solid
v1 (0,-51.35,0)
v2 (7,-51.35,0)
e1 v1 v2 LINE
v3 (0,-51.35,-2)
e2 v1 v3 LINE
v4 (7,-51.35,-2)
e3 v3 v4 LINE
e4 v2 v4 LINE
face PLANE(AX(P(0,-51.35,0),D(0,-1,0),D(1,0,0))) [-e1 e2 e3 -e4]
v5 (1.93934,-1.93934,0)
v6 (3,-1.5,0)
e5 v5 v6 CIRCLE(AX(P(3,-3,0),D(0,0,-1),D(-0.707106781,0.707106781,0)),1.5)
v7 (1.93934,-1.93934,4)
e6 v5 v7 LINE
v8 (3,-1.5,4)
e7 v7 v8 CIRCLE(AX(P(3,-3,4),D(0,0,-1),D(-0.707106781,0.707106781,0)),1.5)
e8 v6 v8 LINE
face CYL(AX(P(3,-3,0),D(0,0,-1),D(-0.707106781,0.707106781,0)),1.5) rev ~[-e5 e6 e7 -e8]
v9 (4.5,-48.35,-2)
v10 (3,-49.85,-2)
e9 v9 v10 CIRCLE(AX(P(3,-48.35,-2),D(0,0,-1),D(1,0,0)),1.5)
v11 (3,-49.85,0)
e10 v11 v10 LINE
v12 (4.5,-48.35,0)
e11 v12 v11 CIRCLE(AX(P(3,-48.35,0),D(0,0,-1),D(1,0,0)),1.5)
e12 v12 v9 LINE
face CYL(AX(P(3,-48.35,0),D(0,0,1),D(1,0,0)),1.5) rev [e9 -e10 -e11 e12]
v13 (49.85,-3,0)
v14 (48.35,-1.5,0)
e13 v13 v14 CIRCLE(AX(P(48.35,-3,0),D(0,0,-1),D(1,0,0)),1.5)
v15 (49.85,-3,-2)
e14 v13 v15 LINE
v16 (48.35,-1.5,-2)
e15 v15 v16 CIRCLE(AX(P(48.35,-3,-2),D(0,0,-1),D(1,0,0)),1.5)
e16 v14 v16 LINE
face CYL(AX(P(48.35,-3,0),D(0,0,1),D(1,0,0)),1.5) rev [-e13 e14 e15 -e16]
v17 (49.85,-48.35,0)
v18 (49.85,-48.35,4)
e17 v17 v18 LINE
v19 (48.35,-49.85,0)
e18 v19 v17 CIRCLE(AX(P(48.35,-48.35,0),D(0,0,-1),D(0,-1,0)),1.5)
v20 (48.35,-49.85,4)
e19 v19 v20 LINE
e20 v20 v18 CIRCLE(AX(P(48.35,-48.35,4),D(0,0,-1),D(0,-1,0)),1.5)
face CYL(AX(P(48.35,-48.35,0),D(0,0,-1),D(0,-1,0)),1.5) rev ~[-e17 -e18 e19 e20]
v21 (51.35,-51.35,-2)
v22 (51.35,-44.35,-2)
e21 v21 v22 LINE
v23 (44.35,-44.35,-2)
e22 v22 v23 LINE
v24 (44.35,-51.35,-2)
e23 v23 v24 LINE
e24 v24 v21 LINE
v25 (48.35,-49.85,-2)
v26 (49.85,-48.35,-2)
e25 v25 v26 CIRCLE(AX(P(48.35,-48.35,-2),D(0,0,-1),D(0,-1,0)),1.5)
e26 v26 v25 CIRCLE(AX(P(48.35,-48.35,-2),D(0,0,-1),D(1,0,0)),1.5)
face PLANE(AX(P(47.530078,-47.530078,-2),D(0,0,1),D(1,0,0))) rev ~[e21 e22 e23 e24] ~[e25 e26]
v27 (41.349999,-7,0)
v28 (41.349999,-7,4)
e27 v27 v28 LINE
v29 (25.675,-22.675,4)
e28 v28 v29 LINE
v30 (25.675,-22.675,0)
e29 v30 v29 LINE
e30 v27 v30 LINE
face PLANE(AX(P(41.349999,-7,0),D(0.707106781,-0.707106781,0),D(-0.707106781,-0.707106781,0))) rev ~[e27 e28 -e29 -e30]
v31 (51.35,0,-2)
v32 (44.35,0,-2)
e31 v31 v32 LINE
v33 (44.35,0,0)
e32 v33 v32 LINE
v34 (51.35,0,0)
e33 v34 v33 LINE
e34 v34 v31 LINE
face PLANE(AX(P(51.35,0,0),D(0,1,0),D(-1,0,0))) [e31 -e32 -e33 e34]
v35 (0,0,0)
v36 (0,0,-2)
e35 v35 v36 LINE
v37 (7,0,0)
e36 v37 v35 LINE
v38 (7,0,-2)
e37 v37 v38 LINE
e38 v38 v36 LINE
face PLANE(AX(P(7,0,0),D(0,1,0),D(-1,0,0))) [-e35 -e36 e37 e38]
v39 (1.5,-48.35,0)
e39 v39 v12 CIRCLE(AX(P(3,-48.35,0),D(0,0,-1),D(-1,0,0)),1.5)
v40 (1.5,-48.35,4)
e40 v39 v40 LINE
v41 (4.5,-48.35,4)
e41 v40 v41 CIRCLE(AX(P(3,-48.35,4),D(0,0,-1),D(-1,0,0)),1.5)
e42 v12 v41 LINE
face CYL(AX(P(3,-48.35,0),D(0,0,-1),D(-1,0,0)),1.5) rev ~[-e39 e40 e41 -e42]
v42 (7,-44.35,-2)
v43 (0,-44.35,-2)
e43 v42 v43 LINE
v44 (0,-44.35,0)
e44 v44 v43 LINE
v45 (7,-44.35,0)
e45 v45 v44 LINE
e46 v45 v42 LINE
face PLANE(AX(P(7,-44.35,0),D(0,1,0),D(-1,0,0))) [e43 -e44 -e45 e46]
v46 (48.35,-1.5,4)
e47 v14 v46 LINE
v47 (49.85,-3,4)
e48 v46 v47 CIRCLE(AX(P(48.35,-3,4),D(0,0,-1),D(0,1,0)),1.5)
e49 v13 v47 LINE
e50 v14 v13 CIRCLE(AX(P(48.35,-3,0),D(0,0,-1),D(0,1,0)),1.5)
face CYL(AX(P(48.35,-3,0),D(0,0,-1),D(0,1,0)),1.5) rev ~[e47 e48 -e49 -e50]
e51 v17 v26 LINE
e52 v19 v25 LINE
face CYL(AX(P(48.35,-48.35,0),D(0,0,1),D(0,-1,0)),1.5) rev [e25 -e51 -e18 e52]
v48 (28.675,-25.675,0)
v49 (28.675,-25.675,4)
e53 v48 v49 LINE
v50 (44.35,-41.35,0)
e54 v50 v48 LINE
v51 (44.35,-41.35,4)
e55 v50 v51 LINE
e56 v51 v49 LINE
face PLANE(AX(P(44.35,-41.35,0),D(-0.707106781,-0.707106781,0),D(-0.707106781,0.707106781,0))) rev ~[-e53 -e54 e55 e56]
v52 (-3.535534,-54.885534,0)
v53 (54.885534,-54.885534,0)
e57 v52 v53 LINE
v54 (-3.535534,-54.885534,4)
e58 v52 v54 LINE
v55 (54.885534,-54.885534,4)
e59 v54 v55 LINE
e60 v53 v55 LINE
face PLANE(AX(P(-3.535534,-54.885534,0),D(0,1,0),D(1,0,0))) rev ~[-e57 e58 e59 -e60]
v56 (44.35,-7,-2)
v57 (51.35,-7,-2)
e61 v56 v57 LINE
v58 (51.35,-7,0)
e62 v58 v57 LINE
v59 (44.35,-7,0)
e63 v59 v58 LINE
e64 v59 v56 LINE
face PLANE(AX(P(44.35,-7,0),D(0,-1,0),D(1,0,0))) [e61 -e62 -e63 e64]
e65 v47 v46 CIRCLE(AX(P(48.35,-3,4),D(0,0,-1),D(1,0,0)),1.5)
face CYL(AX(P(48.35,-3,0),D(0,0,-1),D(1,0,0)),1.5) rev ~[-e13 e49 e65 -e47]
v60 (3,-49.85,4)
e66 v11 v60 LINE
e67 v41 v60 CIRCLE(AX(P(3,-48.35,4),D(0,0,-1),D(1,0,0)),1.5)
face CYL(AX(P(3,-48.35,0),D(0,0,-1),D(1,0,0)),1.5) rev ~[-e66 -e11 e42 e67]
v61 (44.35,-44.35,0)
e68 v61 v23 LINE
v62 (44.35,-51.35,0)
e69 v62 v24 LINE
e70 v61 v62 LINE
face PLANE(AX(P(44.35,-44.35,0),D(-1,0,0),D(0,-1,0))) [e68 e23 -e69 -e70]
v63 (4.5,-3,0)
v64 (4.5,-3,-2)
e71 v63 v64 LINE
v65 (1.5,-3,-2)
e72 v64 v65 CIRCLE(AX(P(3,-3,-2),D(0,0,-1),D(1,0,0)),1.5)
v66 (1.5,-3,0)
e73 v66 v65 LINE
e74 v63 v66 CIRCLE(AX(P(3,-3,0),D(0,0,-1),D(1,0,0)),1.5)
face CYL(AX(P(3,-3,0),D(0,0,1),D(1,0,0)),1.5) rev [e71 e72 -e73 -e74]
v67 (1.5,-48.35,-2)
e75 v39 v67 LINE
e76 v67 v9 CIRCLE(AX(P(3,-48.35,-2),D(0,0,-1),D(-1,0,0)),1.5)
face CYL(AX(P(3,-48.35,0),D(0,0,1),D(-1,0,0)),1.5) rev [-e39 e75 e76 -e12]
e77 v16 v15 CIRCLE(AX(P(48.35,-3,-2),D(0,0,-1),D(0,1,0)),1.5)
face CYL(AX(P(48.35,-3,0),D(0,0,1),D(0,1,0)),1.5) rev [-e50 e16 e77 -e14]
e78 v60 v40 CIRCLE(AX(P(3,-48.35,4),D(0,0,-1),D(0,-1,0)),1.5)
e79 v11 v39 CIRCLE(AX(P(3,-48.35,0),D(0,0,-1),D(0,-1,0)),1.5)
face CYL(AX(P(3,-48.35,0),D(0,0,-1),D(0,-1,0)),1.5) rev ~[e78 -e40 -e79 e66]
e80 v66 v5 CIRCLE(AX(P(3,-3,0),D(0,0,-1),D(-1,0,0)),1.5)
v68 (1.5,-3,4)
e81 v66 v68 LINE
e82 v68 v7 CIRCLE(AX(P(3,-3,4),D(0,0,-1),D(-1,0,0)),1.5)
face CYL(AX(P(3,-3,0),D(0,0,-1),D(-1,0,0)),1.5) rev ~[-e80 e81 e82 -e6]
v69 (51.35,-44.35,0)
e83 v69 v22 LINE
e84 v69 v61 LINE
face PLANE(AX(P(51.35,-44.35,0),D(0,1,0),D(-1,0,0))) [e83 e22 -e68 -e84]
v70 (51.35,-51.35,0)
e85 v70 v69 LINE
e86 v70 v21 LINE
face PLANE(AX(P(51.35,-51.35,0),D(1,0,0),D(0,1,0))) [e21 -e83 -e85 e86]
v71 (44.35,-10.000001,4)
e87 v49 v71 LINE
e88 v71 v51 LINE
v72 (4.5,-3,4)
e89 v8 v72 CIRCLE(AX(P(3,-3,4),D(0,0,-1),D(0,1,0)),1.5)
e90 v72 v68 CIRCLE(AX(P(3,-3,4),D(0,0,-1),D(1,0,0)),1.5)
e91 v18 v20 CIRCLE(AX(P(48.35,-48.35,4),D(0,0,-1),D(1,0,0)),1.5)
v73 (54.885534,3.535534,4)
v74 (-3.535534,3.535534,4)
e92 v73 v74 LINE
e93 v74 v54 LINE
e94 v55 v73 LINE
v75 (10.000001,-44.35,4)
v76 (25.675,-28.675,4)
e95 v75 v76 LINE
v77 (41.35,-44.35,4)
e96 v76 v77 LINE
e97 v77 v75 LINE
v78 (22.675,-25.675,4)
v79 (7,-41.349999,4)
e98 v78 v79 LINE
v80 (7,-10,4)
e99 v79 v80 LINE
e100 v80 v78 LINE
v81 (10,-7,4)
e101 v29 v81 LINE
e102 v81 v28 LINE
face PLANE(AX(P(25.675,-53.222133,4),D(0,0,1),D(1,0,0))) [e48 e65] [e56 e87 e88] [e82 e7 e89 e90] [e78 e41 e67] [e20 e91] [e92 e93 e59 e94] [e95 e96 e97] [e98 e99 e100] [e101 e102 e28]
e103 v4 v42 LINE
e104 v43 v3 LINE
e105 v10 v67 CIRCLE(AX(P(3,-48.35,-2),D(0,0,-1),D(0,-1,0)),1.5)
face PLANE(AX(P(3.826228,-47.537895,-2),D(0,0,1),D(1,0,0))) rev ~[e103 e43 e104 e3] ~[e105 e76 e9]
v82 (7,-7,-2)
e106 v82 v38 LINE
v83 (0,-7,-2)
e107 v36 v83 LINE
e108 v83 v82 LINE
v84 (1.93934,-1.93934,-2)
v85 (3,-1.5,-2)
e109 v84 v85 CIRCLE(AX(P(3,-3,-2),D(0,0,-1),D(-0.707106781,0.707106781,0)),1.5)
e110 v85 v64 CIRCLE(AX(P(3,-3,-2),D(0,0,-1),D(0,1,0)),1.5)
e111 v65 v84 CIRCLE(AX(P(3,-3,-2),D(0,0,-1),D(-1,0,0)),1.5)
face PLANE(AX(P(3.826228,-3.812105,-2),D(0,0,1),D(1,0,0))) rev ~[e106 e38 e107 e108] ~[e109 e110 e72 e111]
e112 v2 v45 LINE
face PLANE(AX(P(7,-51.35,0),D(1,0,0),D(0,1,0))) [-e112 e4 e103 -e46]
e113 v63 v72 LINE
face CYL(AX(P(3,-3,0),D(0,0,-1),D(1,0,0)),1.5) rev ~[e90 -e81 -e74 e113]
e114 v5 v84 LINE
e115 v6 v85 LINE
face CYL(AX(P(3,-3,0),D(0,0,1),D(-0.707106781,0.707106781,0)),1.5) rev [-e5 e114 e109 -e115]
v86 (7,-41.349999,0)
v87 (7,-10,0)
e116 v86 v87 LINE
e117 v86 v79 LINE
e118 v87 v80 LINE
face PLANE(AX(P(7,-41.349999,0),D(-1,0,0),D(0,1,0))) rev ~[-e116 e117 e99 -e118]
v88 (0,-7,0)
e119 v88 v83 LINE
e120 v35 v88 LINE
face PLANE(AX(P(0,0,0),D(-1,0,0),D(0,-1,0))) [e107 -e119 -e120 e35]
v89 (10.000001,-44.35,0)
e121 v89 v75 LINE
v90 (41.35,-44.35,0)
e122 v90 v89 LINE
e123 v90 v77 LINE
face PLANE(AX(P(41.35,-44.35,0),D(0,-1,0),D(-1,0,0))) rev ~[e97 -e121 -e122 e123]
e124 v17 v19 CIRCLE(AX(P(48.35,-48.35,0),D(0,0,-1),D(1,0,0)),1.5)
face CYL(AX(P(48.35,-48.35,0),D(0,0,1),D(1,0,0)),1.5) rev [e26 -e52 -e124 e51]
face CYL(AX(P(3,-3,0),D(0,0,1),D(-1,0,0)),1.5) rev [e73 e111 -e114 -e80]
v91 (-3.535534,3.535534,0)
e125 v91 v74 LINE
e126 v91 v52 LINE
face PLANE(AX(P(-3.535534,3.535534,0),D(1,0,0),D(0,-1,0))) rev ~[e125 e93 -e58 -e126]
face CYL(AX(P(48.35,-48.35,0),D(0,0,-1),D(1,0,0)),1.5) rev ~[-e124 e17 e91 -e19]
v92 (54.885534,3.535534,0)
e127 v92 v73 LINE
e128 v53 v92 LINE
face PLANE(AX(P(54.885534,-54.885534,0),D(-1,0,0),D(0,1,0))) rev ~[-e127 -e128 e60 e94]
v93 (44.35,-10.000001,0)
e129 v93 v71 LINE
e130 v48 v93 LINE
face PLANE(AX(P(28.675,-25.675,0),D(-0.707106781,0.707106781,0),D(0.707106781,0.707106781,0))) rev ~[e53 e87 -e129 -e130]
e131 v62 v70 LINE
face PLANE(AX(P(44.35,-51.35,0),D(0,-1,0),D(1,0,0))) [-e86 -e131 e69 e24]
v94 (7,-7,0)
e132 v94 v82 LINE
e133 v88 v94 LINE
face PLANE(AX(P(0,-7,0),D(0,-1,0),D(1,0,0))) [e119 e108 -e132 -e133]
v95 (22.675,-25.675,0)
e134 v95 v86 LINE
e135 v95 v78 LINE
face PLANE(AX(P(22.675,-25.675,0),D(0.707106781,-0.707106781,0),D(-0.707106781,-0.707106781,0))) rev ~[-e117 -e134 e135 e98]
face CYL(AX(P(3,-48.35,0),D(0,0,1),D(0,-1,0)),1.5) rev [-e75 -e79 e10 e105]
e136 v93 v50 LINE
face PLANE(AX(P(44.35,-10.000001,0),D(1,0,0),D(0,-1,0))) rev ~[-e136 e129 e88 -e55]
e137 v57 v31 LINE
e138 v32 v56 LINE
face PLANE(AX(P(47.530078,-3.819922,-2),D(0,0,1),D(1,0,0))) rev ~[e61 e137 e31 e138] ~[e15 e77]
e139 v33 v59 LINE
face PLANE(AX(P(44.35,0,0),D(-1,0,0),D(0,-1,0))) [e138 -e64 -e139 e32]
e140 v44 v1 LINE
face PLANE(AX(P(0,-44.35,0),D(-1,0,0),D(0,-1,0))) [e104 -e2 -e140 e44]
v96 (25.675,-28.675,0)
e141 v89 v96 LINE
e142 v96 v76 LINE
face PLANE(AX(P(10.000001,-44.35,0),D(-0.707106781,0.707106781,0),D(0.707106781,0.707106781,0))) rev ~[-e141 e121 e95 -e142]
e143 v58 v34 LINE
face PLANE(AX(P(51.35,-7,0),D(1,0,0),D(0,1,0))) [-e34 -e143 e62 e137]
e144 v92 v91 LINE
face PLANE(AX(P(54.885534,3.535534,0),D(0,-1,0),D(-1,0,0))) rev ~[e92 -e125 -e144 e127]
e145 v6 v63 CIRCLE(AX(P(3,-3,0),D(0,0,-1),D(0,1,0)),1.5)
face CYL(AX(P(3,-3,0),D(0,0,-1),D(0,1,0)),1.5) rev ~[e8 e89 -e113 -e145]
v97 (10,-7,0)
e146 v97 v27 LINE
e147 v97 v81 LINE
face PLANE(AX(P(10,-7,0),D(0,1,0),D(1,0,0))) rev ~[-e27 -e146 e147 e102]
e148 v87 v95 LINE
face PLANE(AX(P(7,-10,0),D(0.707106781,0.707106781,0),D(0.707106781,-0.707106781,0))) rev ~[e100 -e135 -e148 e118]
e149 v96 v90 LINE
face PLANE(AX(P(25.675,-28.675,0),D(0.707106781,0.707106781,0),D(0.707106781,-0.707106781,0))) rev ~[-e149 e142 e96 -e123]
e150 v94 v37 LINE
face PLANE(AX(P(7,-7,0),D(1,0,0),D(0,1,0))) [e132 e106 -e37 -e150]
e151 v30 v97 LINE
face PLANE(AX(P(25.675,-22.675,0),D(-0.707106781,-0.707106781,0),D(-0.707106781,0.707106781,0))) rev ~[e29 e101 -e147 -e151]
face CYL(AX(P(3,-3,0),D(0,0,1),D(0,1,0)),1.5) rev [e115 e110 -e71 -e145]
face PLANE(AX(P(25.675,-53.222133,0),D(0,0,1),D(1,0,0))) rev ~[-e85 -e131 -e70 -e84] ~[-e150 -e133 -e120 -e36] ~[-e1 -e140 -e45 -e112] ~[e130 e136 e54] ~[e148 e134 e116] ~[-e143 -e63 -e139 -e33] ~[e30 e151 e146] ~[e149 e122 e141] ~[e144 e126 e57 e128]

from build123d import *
from build123d import SkipClean  # not in build123d's __all__

# Parameters (mm, degrees)
F1_DEPTH = 4
F2_DEPTH = 2


with BuildPart() as f1:
    # F0 (on Top) → F1 (new body)
    with BuildSketch(Plane.XY):
        Polygon((0, -51.35), (-3.5355339059, -54.8855339059), (54.8855339059, -54.8855339059), (51.35, -51.35), (48.35, -51.35), (44.35, -51.35), (7, -51.35), (3, -51.35), align=None)
        Polygon((7, -7), (0, -7), (0, -44.35), (7, -44.35), (7, -41.3499993608), (7, -10), align=None)
        Polygon((10.0000006392, -44.35), (7, -44.35), (7, -51.35), (44.35, -51.35), (44.35, -44.35), (41.35, -44.35), align=None)
        with BuildLine():
            Line((7, -44.35), (0, -44.35))
            Line((0, -44.35), (0, -48.35))
            Line((0, -48.35), (1.5, -48.35))
            ThreePointArc((1.5, -48.35), (3, -46.85), (4.5, -48.35))
            ThreePointArc((4.5, -48.35), (4.0606601718, -49.4106601718), (3, -49.85))
            Line((3, -49.85), (3, -51.35))
            Line((3, -51.35), (7, -51.35))
            Line((7, -51.35), (7, -44.35))
        make_face()
        with BuildLine():
            Line((0, -48.35), (0, -51.35))
            Line((0, -51.35), (3, -51.35))
            Line((3, -51.35), (3, -49.85))
            ThreePointArc((3, -49.85), (1.9393398282, -49.4106601718), (1.5, -48.35))
            Line((1.5, -48.35), (0, -48.35))
        make_face()
        Polygon((0, -3), (0, 0), (-3.5355339059, 3.5355339059), (-3.5355339059, -54.8855339059), (0, -51.35), (0, -48.35), (0, -44.35), (0, -7), align=None)
        with BuildLine():
            Line((7, 0), (3, 0))
            Line((3, 0), (3, -1.5))
            ThreePointArc((3, -1.5), (4.0606601718, -1.9393398282), (4.5, -3))
            ThreePointArc((4.5, -3), (3, -4.5), (1.5, -3))
            Line((1.5, -3), (0, -3))
            Line((0, -3), (0, -7))
            Line((0, -7), (7, -7))
            Line((7, -7), (7, 0))
        make_face()
        with BuildLine():
            Line((3, 0), (0, 0))
            Line((0, 0), (1.9393398282, -1.9393398282))
            ThreePointArc((1.9393398282, -1.9393398282), (2.4259748515, -1.6141807012), (3, -1.5))
            Line((3, -1.5), (3, 0))
        make_face()
        with BuildLine():
            Line((1.9393398282, -1.9393398282), (0, 0))
            Line((0, 0), (0, -3))
            Line((0, -3), (1.5, -3))
            ThreePointArc((1.5, -3), (1.6141807012, -2.4259748515), (1.9393398282, -1.9393398282))
        make_face()
        Polygon((-3.5355339059, 3.5355339059), (0, 0), (3, 0), (7, 0), (44.35, 0), (48.35, 0), (51.35, 0), (54.8855339059, 3.5355339059), align=None)
        Polygon((44.35, 0), (7, 0), (7, -7), (10, -7), (41.3499993608, -7), (44.35, -7), align=None)
        with BuildLine():
            Line((48.35, 0), (44.35, 0))
            Line((44.35, 0), (44.35, -7))
            Line((44.35, -7), (51.35, -7))
            Line((51.35, -7), (51.35, -3))
            Line((51.35, -3), (49.85, -3))
            ThreePointArc((49.85, -3), (47.2893398282, -4.0606601718), (48.35, -1.5))
            Line((48.35, -1.5), (48.35, 0))
        make_face()
        with BuildLine():
            Line((51.35, -3), (51.35, 0))
            Line((51.35, 0), (48.35, 0))
            Line((48.35, 0), (48.35, -1.5))
            ThreePointArc((48.35, -1.5), (49.4106601718, -1.9393398282), (49.85, -3))
            Line((49.85, -3), (51.35, -3))
        make_face()
        Polygon((54.8855339059, -54.8855339059), (54.8855339059, 3.5355339059), (51.35, 0), (51.35, -3), (51.35, -7), (51.35, -44.35), (51.35, -48.35), (51.35, -51.35), align=None)
        Polygon((51.35, -7), (44.35, -7), (44.35, -10.0000006392), (44.35, -41.35), (44.35, -44.35), (51.35, -44.35), align=None)
        with BuildLine():
            Line((48.35, -51.35), (51.35, -51.35))
            Line((51.35, -51.35), (51.35, -48.35))
            Line((51.35, -48.35), (49.85, -48.35))
            ThreePointArc((49.85, -48.35), (49.4106601718, -49.4106601718), (48.35, -49.85))
            Line((48.35, -49.85), (48.35, -51.35))
        make_face()
        with BuildLine():
            Line((44.35, -51.35), (48.35, -51.35))
            Line((48.35, -51.35), (48.35, -49.85))
            ThreePointArc((48.35, -49.85), (47.2893398282, -47.2893398282), (49.85, -48.35))
            Line((49.85, -48.35), (51.35, -48.35))
            Line((51.35, -48.35), (51.35, -44.35))
            Line((51.35, -44.35), (44.35, -44.35))
            Line((44.35, -44.35), (44.35, -51.35))
        make_face()
        Polygon((7, -41.3499993608), (7, -44.35), (8.5000003196, -42.8499996804), align=None)
        Polygon((8.5000003196, -42.8499996804), (7, -44.35), (10.0000006392, -44.35), align=None)
        Polygon((8.5000003196, -42.8499996804), (10.0000006392, -44.35), (25.6750003196, -28.6750003196), (24.175, -27.175), align=None)
        Polygon((22.6749996804, -25.6749996804), (7, -41.3499993608), (8.5000003196, -42.8499996804), (24.175, -27.175), align=None)
        Polygon((8.5, -8.5), (7, -10), (22.6749996804, -25.6749996804), (24.1749996804, -24.1749996804), align=None)
        Polygon((25.6749996804, -22.6749996804), (10, -7), (8.5, -8.5), (24.1749996804, -24.1749996804), align=None)
        Polygon((27.175, -24.175), (25.6749996804, -22.6749996804), (24.1749996804, -24.1749996804), (25.675, -25.675), align=None)
        Polygon((27.1750003196, -27.1750003196), (28.6750003196, -25.6750003196), (27.175, -24.175), (25.675, -25.675), align=None)
        Polygon((25.675, -25.675), (24.175, -27.175), (25.6750003196, -28.6750003196), (27.1750003196, -27.1750003196), align=None)
        Polygon((24.1749996804, -24.1749996804), (22.6749996804, -25.6749996804), (24.175, -27.175), (25.675, -25.675), align=None)
        Polygon((25.6750003196, -28.6750003196), (41.35, -44.35), (42.85, -42.85), (27.1750003196, -27.1750003196), align=None)
        Polygon((42.85, -42.85), (44.35, -41.35), (28.6750003196, -25.6750003196), (27.1750003196, -27.1750003196), align=None)
        Polygon((8.5, -8.5), (7, -7), (7, -10), align=None)
        Polygon((10, -7), (7, -7), (8.5, -8.5), align=None)
        Polygon((28.6750003196, -25.6750003196), (44.35, -10.0000006392), (42.8499996804, -8.5000003196), (27.175, -24.175), align=None)
        Polygon((42.8499996804, -8.5000003196), (41.3499993608, -7), (25.6749996804, -22.6749996804), (27.175, -24.175), align=None)
        Polygon((44.35, -10.0000006392), (44.35, -7), (42.8499996804, -8.5000003196), align=None)
        Polygon((44.35, -44.35), (44.35, -41.35), (42.85, -42.85), align=None)
        Polygon((42.85, -42.85), (41.35, -44.35), (44.35, -44.35), align=None)
        Polygon((42.8499996804, -8.5000003196), (44.35, -7), (41.3499993608, -7), align=None)
    extrude(amount=F1_DEPTH)

    # F0 (on Top) → F2 (join)
    with BuildSketch(Plane.XY):
        with BuildLine():
            Line((7, -44.35), (0, -44.35))
            Line((0, -44.35), (0, -48.35))
            Line((0, -48.35), (1.5, -48.35))
            ThreePointArc((1.5, -48.35), (3, -46.85), (4.5, -48.35))
            ThreePointArc((4.5, -48.35), (4.0606601718, -49.4106601718), (3, -49.85))
            Line((3, -49.85), (3, -51.35))
            Line((3, -51.35), (7, -51.35))
            Line((7, -51.35), (7, -44.35))
        make_face()
        with BuildLine():
            Line((0, -48.35), (0, -51.35))
            Line((0, -51.35), (3, -51.35))
            Line((3, -51.35), (3, -49.85))
            ThreePointArc((3, -49.85), (1.9393398282, -49.4106601718), (1.5, -48.35))
            Line((1.5, -48.35), (0, -48.35))
        make_face()
        with BuildLine():
            Line((44.35, -51.35), (48.35, -51.35))
            Line((48.35, -51.35), (48.35, -49.85))
            ThreePointArc((48.35, -49.85), (47.2893398282, -47.2893398282), (49.85, -48.35))
            Line((49.85, -48.35), (51.35, -48.35))
            Line((51.35, -48.35), (51.35, -44.35))
            Line((51.35, -44.35), (44.35, -44.35))
            Line((44.35, -44.35), (44.35, -51.35))
        make_face()
        with BuildLine():
            Line((48.35, -51.35), (51.35, -51.35))
            Line((51.35, -51.35), (51.35, -48.35))
            Line((51.35, -48.35), (49.85, -48.35))
            ThreePointArc((49.85, -48.35), (49.4106601718, -49.4106601718), (48.35, -49.85))
            Line((48.35, -49.85), (48.35, -51.35))
        make_face()
        with BuildLine():
            Line((48.35, 0), (44.35, 0))
            Line((44.35, 0), (44.35, -7))
            Line((44.35, -7), (51.35, -7))
            Line((51.35, -7), (51.35, -3))
            Line((51.35, -3), (49.85, -3))
            ThreePointArc((49.85, -3), (47.2893398282, -4.0606601718), (48.35, -1.5))
            Line((48.35, -1.5), (48.35, 0))
        make_face()
        with BuildLine():
            Line((51.35, -3), (51.35, 0))
            Line((51.35, 0), (48.35, 0))
            Line((48.35, 0), (48.35, -1.5))
            ThreePointArc((48.35, -1.5), (49.4106601718, -1.9393398282), (49.85, -3))
            Line((49.85, -3), (51.35, -3))
        make_face()
        with BuildLine():
            Line((7, 0), (3, 0))
            Line((3, 0), (3, -1.5))
            ThreePointArc((3, -1.5), (4.0606601718, -1.9393398282), (4.5, -3))
            ThreePointArc((4.5, -3), (3, -4.5), (1.5, -3))
            Line((1.5, -3), (0, -3))
            Line((0, -3), (0, -7))
            Line((0, -7), (7, -7))
            Line((7, -7), (7, 0))
        make_face()
        with BuildLine():
            Line((1.9393398282, -1.9393398282), (0, 0))
            Line((0, 0), (0, -3))
            Line((0, -3), (1.5, -3))
            ThreePointArc((1.5, -3), (1.6141807012, -2.4259748515), (1.9393398282, -1.9393398282))
        make_face()
        with BuildLine():
            Line((3, 0), (0, 0))
            Line((0, 0), (1.9393398282, -1.9393398282))
            ThreePointArc((1.9393398282, -1.9393398282), (2.4259748515, -1.6141807012), (3, -1.5))
            Line((3, -1.5), (3, 0))
        make_face()
    with SkipClean():  # cleaning this boolean's faces spoils the solid; the shape is the same uncleaned
        extrude(amount=-F2_DEPTH)


solid = f1.part
